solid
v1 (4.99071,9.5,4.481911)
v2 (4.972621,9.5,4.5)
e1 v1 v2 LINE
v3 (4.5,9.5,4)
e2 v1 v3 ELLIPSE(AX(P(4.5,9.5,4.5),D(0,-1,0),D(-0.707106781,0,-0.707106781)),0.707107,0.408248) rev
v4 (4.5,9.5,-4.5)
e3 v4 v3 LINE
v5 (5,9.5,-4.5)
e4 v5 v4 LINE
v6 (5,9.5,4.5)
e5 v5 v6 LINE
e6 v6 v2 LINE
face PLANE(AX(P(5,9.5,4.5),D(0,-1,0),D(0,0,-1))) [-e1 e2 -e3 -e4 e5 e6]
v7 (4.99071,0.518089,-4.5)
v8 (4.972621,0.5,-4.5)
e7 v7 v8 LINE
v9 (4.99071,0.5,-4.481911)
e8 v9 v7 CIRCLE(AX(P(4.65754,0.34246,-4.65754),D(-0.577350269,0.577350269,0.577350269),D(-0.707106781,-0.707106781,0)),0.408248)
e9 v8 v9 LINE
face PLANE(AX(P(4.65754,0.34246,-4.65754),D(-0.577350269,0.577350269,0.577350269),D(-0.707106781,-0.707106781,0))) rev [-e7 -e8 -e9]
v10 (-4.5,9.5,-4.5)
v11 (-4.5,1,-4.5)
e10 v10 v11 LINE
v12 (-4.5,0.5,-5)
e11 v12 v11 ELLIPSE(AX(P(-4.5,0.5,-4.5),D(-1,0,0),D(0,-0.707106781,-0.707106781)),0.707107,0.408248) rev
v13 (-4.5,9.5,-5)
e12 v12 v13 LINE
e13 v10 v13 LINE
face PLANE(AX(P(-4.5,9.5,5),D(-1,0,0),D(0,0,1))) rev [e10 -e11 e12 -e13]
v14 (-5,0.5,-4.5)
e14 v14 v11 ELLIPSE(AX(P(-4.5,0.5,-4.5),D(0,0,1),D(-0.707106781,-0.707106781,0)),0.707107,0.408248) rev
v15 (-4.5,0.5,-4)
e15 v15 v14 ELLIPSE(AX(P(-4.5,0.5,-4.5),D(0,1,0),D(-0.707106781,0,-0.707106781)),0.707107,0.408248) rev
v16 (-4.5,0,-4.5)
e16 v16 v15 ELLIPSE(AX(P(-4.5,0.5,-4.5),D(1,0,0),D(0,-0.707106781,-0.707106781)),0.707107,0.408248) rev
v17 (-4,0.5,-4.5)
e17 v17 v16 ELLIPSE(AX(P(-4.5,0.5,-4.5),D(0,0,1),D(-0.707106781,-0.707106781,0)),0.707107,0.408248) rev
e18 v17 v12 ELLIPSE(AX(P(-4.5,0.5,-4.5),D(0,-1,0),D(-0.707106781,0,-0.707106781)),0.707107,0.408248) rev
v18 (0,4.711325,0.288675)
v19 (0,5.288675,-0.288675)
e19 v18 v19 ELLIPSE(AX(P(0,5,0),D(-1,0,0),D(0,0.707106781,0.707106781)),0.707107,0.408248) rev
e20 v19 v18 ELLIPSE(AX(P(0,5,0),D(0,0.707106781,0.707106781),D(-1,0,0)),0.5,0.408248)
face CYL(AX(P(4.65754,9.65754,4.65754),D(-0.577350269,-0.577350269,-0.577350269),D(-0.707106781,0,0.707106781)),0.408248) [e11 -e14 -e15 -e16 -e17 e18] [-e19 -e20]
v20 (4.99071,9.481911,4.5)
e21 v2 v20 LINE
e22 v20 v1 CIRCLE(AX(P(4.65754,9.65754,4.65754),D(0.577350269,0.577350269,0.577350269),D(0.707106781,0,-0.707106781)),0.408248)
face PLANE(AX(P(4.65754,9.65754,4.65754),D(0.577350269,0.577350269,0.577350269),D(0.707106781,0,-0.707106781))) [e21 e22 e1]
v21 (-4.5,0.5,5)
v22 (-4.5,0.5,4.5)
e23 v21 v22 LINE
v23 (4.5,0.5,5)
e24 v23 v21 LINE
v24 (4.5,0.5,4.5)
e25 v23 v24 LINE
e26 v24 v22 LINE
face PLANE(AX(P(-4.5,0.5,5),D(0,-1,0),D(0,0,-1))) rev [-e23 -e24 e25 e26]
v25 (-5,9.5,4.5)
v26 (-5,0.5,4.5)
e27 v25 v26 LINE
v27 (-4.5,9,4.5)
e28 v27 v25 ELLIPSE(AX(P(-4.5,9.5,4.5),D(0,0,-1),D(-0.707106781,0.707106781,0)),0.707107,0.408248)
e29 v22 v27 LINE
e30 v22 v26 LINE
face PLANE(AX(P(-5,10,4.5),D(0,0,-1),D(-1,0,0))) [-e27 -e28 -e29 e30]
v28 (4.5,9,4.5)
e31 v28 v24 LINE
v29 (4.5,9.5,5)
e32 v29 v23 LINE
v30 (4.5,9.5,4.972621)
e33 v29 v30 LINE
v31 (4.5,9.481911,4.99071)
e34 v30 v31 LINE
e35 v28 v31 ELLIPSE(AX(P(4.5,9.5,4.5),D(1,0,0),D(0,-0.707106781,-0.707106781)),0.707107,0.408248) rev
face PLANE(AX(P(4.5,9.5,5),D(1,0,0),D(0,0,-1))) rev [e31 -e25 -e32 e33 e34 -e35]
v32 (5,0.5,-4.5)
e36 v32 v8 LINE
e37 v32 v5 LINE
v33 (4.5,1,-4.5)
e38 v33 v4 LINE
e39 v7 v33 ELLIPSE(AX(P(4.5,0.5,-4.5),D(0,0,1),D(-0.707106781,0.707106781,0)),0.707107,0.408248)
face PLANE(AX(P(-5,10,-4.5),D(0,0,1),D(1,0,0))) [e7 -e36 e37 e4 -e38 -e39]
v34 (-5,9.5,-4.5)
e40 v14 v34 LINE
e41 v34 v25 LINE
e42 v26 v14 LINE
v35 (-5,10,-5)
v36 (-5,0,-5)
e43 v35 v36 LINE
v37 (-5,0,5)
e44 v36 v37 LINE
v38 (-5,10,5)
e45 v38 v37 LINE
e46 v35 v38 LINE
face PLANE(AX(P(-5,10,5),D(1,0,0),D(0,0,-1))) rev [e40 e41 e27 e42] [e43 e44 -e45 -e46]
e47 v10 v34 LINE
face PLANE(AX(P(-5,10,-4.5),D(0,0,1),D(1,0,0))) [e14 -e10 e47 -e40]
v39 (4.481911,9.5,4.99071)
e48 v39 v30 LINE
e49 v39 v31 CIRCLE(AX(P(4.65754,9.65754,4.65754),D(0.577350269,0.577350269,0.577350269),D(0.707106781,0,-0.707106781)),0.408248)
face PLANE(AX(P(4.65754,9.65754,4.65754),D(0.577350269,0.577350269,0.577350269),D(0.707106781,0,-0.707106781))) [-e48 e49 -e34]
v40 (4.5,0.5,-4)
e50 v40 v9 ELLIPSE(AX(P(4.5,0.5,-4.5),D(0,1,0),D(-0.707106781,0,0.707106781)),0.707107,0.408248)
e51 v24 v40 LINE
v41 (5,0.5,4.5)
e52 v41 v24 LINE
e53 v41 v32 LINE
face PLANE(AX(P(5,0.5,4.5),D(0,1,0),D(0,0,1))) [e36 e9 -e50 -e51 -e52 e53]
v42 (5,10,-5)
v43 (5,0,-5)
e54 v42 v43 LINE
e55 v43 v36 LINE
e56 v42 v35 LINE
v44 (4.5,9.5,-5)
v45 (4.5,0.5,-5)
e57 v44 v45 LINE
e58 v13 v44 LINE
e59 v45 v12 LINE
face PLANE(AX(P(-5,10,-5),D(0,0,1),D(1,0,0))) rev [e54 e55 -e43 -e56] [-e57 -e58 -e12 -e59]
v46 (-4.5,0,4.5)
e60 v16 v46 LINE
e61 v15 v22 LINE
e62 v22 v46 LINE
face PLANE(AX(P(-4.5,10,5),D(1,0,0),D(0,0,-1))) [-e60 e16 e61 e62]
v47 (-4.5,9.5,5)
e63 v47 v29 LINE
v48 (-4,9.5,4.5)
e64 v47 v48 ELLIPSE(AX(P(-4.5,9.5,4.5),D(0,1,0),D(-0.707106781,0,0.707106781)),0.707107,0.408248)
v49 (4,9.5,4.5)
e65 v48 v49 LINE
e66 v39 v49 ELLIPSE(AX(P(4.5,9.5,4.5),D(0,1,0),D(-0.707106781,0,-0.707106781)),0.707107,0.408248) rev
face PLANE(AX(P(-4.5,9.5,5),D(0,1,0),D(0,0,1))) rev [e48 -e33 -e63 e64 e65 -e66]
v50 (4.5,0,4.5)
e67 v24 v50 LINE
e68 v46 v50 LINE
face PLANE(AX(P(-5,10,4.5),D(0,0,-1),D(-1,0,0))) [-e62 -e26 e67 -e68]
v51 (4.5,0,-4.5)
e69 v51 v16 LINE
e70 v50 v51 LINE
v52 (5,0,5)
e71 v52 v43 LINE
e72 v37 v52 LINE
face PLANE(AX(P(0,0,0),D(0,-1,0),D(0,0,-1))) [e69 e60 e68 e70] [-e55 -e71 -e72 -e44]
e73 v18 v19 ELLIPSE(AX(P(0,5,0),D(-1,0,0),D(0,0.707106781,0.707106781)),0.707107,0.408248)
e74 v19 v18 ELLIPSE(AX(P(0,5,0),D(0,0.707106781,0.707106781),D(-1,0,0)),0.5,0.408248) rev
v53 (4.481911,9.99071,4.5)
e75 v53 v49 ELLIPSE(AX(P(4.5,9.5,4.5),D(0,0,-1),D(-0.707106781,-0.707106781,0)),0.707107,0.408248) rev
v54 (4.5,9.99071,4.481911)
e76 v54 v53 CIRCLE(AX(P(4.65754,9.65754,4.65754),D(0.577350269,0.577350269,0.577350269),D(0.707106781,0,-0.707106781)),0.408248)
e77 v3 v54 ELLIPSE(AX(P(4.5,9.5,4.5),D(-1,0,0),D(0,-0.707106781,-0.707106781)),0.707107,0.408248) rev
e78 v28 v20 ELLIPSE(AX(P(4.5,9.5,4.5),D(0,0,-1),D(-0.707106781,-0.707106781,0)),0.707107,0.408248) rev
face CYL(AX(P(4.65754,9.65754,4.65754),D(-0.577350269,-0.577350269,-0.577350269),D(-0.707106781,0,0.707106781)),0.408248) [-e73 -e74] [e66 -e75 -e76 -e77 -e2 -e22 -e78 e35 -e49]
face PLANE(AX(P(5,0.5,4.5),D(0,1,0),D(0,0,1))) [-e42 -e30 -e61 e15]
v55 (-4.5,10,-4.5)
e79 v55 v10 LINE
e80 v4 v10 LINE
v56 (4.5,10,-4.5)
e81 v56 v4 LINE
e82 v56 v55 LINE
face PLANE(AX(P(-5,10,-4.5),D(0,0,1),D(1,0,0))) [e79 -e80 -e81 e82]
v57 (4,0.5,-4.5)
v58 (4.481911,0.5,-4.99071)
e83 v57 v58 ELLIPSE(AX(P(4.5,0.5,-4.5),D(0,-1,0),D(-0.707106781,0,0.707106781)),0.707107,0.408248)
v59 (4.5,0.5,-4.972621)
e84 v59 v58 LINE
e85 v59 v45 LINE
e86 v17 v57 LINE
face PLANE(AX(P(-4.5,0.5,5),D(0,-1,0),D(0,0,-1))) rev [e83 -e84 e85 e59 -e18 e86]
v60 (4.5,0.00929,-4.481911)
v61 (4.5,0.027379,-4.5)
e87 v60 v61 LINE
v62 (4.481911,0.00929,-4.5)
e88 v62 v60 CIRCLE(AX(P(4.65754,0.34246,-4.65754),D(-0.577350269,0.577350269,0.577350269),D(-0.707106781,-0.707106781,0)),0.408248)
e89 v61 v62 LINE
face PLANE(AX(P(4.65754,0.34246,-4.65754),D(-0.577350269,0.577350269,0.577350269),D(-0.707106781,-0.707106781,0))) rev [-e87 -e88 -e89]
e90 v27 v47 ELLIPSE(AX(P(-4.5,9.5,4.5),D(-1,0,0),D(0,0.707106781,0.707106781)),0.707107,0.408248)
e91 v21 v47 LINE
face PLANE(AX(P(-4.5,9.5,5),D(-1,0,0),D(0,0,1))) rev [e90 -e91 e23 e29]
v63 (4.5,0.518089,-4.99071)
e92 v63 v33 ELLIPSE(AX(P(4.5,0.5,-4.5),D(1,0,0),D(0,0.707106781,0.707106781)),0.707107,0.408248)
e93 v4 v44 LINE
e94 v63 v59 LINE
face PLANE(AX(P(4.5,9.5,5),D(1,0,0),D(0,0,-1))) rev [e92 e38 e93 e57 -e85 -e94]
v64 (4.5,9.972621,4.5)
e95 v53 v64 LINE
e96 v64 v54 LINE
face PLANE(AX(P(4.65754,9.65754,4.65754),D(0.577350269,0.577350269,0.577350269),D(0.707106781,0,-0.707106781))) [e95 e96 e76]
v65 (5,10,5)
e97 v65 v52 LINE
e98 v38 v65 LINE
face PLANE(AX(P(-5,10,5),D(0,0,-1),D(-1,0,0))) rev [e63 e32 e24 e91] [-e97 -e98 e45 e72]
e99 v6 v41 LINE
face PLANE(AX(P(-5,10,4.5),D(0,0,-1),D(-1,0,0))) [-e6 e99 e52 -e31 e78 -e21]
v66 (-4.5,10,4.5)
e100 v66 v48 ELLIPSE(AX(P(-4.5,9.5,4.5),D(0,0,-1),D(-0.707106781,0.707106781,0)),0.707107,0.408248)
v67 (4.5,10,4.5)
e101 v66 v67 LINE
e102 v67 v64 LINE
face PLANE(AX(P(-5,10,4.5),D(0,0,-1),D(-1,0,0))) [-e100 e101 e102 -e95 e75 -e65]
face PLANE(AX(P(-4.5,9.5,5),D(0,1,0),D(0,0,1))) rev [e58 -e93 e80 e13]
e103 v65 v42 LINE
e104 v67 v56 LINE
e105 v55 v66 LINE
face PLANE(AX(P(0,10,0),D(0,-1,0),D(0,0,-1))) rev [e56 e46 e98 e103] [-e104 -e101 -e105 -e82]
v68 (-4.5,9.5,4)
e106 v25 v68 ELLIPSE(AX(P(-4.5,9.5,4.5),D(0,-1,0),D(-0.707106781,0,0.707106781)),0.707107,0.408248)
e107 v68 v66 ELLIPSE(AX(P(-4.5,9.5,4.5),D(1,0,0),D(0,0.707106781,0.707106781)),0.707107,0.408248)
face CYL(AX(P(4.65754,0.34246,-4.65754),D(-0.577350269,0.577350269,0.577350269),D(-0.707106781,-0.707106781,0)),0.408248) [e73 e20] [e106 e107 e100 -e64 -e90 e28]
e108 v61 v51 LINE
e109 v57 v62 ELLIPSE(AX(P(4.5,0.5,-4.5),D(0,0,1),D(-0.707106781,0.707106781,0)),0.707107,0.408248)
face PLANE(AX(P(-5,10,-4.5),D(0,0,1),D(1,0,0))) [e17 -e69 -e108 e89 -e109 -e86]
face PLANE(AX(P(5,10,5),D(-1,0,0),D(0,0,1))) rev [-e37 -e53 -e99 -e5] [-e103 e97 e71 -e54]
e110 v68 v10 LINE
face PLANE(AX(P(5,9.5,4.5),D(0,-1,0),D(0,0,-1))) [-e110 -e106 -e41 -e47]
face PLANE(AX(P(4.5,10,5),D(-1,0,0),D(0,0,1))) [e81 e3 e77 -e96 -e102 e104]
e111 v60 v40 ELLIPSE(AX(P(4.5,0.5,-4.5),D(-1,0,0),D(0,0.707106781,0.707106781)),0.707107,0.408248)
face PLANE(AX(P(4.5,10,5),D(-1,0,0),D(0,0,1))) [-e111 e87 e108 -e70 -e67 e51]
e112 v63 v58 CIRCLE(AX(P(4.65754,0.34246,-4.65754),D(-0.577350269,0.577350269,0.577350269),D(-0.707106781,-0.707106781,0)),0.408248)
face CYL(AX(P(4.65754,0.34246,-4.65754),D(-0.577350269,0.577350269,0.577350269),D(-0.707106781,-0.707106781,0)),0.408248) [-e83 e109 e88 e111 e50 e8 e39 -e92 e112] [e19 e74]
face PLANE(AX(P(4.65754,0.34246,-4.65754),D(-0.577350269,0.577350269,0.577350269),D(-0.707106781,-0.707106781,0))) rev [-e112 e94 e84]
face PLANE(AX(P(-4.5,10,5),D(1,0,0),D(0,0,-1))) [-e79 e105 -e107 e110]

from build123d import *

# Parameters (mm, degrees)
SKETCH1_W           = 10
SKETCH1_H           = 10
BOSS_EXTRUDE1_DEPTH = 10
SHELL2_T            = -0.5
CUT_EXTRUDE1_DEPTH  = 17.748134224
CUT_EXTRUDE2_DEPTH  = 17.748134224
SKETCH5_R           = 0.40824829
BOSS_EXTRUDE6_DEPTH = 16.15
SKETCH9_R           = 0.40824829
BOSS_EXTRUDE5_DEPTH = 16.15


with BuildPart() as part:
    # Sketch1 → Boss-Extrude1 (new body)
    with BuildSketch(Plane(origin=(0, 0, 0), x_dir=(1, 0, 0), z_dir=(0, 1, 0))):
        Rectangle(SKETCH1_W, SKETCH1_H)
    extrude(amount=BOSS_EXTRUDE1_DEPTH)

    # Shell2
    shell2_openings = [part.faces().sort_by_distance(p)[0] for p in [
        (0, 0, 0),
        (0, 10, 0),
    ]]
    offset(amount=SHELL2_T, openings=shell2_openings, kind=Kind.INTERSECTION)

    # 3DSketch1 → Cut-Extrude1 (cut, through all)
    with BuildSketch(Plane(origin=(5, 9.5, 4.5), x_dir=(0, -0.7071067811865475, -0.7071067811865476), z_dir=(1, 0, 0))):
        Polygon((0, 0), (6.363961031, 6.363961031), (12.727922061, 0), (6.363961031, -6.363961031), align=None)
    extrude(amount=-CUT_EXTRUDE1_DEPTH, mode=Mode.SUBTRACT)

    # 3DSketch2 → Cut-Extrude2 (cut, through all)
    with BuildSketch(Plane(origin=(-4.5, 9.5, 5), x_dir=(0.7071067811865476, -0.7071067811865475, 0), z_dir=(0, 0, -1))):
        Polygon((0, 0), (6.363961031, 6.363961031), (12.727922061, 0), (6.363961031, -6.363961031), align=None)
    extrude(amount=CUT_EXTRUDE2_DEPTH, mode=Mode.SUBTRACT)

    # Sketch5 → Boss-Extrude6 (add)
    with BuildSketch(Plane(origin=(-6.333333333, 6.333333333, 6.333333333), x_dir=(0.816496580927726, 0.4082482904638632, 0.4082482904638628), z_dir=(-0.5773502691896257, 0.5773502691896262, 0.5773502691896255))):
        with Locations(Location((2.041241452, 3.535533906, 0), (0, 0, 180))):
            Circle(SKETCH5_R)
    extrude(amount=-BOSS_EXTRUDE6_DEPTH)

    # Sketch9 → Boss-Extrude5 (add)
    with BuildSketch(Plane(origin=(-3, -3, -3), x_dir=(0.8164965809277259, -0.4082482904638629, -0.4082482904638633), z_dir=(0.577350269189626, 0.5773502691896255, 0.577350269189626))):
        with Locations(Location((-2.041241452, 3.535533906, 0), (0, 0, 238.204536501))):
            Circle(SKETCH9_R)
    extrude(amount=BOSS_EXTRUDE5_DEPTH)


solid = part.part
